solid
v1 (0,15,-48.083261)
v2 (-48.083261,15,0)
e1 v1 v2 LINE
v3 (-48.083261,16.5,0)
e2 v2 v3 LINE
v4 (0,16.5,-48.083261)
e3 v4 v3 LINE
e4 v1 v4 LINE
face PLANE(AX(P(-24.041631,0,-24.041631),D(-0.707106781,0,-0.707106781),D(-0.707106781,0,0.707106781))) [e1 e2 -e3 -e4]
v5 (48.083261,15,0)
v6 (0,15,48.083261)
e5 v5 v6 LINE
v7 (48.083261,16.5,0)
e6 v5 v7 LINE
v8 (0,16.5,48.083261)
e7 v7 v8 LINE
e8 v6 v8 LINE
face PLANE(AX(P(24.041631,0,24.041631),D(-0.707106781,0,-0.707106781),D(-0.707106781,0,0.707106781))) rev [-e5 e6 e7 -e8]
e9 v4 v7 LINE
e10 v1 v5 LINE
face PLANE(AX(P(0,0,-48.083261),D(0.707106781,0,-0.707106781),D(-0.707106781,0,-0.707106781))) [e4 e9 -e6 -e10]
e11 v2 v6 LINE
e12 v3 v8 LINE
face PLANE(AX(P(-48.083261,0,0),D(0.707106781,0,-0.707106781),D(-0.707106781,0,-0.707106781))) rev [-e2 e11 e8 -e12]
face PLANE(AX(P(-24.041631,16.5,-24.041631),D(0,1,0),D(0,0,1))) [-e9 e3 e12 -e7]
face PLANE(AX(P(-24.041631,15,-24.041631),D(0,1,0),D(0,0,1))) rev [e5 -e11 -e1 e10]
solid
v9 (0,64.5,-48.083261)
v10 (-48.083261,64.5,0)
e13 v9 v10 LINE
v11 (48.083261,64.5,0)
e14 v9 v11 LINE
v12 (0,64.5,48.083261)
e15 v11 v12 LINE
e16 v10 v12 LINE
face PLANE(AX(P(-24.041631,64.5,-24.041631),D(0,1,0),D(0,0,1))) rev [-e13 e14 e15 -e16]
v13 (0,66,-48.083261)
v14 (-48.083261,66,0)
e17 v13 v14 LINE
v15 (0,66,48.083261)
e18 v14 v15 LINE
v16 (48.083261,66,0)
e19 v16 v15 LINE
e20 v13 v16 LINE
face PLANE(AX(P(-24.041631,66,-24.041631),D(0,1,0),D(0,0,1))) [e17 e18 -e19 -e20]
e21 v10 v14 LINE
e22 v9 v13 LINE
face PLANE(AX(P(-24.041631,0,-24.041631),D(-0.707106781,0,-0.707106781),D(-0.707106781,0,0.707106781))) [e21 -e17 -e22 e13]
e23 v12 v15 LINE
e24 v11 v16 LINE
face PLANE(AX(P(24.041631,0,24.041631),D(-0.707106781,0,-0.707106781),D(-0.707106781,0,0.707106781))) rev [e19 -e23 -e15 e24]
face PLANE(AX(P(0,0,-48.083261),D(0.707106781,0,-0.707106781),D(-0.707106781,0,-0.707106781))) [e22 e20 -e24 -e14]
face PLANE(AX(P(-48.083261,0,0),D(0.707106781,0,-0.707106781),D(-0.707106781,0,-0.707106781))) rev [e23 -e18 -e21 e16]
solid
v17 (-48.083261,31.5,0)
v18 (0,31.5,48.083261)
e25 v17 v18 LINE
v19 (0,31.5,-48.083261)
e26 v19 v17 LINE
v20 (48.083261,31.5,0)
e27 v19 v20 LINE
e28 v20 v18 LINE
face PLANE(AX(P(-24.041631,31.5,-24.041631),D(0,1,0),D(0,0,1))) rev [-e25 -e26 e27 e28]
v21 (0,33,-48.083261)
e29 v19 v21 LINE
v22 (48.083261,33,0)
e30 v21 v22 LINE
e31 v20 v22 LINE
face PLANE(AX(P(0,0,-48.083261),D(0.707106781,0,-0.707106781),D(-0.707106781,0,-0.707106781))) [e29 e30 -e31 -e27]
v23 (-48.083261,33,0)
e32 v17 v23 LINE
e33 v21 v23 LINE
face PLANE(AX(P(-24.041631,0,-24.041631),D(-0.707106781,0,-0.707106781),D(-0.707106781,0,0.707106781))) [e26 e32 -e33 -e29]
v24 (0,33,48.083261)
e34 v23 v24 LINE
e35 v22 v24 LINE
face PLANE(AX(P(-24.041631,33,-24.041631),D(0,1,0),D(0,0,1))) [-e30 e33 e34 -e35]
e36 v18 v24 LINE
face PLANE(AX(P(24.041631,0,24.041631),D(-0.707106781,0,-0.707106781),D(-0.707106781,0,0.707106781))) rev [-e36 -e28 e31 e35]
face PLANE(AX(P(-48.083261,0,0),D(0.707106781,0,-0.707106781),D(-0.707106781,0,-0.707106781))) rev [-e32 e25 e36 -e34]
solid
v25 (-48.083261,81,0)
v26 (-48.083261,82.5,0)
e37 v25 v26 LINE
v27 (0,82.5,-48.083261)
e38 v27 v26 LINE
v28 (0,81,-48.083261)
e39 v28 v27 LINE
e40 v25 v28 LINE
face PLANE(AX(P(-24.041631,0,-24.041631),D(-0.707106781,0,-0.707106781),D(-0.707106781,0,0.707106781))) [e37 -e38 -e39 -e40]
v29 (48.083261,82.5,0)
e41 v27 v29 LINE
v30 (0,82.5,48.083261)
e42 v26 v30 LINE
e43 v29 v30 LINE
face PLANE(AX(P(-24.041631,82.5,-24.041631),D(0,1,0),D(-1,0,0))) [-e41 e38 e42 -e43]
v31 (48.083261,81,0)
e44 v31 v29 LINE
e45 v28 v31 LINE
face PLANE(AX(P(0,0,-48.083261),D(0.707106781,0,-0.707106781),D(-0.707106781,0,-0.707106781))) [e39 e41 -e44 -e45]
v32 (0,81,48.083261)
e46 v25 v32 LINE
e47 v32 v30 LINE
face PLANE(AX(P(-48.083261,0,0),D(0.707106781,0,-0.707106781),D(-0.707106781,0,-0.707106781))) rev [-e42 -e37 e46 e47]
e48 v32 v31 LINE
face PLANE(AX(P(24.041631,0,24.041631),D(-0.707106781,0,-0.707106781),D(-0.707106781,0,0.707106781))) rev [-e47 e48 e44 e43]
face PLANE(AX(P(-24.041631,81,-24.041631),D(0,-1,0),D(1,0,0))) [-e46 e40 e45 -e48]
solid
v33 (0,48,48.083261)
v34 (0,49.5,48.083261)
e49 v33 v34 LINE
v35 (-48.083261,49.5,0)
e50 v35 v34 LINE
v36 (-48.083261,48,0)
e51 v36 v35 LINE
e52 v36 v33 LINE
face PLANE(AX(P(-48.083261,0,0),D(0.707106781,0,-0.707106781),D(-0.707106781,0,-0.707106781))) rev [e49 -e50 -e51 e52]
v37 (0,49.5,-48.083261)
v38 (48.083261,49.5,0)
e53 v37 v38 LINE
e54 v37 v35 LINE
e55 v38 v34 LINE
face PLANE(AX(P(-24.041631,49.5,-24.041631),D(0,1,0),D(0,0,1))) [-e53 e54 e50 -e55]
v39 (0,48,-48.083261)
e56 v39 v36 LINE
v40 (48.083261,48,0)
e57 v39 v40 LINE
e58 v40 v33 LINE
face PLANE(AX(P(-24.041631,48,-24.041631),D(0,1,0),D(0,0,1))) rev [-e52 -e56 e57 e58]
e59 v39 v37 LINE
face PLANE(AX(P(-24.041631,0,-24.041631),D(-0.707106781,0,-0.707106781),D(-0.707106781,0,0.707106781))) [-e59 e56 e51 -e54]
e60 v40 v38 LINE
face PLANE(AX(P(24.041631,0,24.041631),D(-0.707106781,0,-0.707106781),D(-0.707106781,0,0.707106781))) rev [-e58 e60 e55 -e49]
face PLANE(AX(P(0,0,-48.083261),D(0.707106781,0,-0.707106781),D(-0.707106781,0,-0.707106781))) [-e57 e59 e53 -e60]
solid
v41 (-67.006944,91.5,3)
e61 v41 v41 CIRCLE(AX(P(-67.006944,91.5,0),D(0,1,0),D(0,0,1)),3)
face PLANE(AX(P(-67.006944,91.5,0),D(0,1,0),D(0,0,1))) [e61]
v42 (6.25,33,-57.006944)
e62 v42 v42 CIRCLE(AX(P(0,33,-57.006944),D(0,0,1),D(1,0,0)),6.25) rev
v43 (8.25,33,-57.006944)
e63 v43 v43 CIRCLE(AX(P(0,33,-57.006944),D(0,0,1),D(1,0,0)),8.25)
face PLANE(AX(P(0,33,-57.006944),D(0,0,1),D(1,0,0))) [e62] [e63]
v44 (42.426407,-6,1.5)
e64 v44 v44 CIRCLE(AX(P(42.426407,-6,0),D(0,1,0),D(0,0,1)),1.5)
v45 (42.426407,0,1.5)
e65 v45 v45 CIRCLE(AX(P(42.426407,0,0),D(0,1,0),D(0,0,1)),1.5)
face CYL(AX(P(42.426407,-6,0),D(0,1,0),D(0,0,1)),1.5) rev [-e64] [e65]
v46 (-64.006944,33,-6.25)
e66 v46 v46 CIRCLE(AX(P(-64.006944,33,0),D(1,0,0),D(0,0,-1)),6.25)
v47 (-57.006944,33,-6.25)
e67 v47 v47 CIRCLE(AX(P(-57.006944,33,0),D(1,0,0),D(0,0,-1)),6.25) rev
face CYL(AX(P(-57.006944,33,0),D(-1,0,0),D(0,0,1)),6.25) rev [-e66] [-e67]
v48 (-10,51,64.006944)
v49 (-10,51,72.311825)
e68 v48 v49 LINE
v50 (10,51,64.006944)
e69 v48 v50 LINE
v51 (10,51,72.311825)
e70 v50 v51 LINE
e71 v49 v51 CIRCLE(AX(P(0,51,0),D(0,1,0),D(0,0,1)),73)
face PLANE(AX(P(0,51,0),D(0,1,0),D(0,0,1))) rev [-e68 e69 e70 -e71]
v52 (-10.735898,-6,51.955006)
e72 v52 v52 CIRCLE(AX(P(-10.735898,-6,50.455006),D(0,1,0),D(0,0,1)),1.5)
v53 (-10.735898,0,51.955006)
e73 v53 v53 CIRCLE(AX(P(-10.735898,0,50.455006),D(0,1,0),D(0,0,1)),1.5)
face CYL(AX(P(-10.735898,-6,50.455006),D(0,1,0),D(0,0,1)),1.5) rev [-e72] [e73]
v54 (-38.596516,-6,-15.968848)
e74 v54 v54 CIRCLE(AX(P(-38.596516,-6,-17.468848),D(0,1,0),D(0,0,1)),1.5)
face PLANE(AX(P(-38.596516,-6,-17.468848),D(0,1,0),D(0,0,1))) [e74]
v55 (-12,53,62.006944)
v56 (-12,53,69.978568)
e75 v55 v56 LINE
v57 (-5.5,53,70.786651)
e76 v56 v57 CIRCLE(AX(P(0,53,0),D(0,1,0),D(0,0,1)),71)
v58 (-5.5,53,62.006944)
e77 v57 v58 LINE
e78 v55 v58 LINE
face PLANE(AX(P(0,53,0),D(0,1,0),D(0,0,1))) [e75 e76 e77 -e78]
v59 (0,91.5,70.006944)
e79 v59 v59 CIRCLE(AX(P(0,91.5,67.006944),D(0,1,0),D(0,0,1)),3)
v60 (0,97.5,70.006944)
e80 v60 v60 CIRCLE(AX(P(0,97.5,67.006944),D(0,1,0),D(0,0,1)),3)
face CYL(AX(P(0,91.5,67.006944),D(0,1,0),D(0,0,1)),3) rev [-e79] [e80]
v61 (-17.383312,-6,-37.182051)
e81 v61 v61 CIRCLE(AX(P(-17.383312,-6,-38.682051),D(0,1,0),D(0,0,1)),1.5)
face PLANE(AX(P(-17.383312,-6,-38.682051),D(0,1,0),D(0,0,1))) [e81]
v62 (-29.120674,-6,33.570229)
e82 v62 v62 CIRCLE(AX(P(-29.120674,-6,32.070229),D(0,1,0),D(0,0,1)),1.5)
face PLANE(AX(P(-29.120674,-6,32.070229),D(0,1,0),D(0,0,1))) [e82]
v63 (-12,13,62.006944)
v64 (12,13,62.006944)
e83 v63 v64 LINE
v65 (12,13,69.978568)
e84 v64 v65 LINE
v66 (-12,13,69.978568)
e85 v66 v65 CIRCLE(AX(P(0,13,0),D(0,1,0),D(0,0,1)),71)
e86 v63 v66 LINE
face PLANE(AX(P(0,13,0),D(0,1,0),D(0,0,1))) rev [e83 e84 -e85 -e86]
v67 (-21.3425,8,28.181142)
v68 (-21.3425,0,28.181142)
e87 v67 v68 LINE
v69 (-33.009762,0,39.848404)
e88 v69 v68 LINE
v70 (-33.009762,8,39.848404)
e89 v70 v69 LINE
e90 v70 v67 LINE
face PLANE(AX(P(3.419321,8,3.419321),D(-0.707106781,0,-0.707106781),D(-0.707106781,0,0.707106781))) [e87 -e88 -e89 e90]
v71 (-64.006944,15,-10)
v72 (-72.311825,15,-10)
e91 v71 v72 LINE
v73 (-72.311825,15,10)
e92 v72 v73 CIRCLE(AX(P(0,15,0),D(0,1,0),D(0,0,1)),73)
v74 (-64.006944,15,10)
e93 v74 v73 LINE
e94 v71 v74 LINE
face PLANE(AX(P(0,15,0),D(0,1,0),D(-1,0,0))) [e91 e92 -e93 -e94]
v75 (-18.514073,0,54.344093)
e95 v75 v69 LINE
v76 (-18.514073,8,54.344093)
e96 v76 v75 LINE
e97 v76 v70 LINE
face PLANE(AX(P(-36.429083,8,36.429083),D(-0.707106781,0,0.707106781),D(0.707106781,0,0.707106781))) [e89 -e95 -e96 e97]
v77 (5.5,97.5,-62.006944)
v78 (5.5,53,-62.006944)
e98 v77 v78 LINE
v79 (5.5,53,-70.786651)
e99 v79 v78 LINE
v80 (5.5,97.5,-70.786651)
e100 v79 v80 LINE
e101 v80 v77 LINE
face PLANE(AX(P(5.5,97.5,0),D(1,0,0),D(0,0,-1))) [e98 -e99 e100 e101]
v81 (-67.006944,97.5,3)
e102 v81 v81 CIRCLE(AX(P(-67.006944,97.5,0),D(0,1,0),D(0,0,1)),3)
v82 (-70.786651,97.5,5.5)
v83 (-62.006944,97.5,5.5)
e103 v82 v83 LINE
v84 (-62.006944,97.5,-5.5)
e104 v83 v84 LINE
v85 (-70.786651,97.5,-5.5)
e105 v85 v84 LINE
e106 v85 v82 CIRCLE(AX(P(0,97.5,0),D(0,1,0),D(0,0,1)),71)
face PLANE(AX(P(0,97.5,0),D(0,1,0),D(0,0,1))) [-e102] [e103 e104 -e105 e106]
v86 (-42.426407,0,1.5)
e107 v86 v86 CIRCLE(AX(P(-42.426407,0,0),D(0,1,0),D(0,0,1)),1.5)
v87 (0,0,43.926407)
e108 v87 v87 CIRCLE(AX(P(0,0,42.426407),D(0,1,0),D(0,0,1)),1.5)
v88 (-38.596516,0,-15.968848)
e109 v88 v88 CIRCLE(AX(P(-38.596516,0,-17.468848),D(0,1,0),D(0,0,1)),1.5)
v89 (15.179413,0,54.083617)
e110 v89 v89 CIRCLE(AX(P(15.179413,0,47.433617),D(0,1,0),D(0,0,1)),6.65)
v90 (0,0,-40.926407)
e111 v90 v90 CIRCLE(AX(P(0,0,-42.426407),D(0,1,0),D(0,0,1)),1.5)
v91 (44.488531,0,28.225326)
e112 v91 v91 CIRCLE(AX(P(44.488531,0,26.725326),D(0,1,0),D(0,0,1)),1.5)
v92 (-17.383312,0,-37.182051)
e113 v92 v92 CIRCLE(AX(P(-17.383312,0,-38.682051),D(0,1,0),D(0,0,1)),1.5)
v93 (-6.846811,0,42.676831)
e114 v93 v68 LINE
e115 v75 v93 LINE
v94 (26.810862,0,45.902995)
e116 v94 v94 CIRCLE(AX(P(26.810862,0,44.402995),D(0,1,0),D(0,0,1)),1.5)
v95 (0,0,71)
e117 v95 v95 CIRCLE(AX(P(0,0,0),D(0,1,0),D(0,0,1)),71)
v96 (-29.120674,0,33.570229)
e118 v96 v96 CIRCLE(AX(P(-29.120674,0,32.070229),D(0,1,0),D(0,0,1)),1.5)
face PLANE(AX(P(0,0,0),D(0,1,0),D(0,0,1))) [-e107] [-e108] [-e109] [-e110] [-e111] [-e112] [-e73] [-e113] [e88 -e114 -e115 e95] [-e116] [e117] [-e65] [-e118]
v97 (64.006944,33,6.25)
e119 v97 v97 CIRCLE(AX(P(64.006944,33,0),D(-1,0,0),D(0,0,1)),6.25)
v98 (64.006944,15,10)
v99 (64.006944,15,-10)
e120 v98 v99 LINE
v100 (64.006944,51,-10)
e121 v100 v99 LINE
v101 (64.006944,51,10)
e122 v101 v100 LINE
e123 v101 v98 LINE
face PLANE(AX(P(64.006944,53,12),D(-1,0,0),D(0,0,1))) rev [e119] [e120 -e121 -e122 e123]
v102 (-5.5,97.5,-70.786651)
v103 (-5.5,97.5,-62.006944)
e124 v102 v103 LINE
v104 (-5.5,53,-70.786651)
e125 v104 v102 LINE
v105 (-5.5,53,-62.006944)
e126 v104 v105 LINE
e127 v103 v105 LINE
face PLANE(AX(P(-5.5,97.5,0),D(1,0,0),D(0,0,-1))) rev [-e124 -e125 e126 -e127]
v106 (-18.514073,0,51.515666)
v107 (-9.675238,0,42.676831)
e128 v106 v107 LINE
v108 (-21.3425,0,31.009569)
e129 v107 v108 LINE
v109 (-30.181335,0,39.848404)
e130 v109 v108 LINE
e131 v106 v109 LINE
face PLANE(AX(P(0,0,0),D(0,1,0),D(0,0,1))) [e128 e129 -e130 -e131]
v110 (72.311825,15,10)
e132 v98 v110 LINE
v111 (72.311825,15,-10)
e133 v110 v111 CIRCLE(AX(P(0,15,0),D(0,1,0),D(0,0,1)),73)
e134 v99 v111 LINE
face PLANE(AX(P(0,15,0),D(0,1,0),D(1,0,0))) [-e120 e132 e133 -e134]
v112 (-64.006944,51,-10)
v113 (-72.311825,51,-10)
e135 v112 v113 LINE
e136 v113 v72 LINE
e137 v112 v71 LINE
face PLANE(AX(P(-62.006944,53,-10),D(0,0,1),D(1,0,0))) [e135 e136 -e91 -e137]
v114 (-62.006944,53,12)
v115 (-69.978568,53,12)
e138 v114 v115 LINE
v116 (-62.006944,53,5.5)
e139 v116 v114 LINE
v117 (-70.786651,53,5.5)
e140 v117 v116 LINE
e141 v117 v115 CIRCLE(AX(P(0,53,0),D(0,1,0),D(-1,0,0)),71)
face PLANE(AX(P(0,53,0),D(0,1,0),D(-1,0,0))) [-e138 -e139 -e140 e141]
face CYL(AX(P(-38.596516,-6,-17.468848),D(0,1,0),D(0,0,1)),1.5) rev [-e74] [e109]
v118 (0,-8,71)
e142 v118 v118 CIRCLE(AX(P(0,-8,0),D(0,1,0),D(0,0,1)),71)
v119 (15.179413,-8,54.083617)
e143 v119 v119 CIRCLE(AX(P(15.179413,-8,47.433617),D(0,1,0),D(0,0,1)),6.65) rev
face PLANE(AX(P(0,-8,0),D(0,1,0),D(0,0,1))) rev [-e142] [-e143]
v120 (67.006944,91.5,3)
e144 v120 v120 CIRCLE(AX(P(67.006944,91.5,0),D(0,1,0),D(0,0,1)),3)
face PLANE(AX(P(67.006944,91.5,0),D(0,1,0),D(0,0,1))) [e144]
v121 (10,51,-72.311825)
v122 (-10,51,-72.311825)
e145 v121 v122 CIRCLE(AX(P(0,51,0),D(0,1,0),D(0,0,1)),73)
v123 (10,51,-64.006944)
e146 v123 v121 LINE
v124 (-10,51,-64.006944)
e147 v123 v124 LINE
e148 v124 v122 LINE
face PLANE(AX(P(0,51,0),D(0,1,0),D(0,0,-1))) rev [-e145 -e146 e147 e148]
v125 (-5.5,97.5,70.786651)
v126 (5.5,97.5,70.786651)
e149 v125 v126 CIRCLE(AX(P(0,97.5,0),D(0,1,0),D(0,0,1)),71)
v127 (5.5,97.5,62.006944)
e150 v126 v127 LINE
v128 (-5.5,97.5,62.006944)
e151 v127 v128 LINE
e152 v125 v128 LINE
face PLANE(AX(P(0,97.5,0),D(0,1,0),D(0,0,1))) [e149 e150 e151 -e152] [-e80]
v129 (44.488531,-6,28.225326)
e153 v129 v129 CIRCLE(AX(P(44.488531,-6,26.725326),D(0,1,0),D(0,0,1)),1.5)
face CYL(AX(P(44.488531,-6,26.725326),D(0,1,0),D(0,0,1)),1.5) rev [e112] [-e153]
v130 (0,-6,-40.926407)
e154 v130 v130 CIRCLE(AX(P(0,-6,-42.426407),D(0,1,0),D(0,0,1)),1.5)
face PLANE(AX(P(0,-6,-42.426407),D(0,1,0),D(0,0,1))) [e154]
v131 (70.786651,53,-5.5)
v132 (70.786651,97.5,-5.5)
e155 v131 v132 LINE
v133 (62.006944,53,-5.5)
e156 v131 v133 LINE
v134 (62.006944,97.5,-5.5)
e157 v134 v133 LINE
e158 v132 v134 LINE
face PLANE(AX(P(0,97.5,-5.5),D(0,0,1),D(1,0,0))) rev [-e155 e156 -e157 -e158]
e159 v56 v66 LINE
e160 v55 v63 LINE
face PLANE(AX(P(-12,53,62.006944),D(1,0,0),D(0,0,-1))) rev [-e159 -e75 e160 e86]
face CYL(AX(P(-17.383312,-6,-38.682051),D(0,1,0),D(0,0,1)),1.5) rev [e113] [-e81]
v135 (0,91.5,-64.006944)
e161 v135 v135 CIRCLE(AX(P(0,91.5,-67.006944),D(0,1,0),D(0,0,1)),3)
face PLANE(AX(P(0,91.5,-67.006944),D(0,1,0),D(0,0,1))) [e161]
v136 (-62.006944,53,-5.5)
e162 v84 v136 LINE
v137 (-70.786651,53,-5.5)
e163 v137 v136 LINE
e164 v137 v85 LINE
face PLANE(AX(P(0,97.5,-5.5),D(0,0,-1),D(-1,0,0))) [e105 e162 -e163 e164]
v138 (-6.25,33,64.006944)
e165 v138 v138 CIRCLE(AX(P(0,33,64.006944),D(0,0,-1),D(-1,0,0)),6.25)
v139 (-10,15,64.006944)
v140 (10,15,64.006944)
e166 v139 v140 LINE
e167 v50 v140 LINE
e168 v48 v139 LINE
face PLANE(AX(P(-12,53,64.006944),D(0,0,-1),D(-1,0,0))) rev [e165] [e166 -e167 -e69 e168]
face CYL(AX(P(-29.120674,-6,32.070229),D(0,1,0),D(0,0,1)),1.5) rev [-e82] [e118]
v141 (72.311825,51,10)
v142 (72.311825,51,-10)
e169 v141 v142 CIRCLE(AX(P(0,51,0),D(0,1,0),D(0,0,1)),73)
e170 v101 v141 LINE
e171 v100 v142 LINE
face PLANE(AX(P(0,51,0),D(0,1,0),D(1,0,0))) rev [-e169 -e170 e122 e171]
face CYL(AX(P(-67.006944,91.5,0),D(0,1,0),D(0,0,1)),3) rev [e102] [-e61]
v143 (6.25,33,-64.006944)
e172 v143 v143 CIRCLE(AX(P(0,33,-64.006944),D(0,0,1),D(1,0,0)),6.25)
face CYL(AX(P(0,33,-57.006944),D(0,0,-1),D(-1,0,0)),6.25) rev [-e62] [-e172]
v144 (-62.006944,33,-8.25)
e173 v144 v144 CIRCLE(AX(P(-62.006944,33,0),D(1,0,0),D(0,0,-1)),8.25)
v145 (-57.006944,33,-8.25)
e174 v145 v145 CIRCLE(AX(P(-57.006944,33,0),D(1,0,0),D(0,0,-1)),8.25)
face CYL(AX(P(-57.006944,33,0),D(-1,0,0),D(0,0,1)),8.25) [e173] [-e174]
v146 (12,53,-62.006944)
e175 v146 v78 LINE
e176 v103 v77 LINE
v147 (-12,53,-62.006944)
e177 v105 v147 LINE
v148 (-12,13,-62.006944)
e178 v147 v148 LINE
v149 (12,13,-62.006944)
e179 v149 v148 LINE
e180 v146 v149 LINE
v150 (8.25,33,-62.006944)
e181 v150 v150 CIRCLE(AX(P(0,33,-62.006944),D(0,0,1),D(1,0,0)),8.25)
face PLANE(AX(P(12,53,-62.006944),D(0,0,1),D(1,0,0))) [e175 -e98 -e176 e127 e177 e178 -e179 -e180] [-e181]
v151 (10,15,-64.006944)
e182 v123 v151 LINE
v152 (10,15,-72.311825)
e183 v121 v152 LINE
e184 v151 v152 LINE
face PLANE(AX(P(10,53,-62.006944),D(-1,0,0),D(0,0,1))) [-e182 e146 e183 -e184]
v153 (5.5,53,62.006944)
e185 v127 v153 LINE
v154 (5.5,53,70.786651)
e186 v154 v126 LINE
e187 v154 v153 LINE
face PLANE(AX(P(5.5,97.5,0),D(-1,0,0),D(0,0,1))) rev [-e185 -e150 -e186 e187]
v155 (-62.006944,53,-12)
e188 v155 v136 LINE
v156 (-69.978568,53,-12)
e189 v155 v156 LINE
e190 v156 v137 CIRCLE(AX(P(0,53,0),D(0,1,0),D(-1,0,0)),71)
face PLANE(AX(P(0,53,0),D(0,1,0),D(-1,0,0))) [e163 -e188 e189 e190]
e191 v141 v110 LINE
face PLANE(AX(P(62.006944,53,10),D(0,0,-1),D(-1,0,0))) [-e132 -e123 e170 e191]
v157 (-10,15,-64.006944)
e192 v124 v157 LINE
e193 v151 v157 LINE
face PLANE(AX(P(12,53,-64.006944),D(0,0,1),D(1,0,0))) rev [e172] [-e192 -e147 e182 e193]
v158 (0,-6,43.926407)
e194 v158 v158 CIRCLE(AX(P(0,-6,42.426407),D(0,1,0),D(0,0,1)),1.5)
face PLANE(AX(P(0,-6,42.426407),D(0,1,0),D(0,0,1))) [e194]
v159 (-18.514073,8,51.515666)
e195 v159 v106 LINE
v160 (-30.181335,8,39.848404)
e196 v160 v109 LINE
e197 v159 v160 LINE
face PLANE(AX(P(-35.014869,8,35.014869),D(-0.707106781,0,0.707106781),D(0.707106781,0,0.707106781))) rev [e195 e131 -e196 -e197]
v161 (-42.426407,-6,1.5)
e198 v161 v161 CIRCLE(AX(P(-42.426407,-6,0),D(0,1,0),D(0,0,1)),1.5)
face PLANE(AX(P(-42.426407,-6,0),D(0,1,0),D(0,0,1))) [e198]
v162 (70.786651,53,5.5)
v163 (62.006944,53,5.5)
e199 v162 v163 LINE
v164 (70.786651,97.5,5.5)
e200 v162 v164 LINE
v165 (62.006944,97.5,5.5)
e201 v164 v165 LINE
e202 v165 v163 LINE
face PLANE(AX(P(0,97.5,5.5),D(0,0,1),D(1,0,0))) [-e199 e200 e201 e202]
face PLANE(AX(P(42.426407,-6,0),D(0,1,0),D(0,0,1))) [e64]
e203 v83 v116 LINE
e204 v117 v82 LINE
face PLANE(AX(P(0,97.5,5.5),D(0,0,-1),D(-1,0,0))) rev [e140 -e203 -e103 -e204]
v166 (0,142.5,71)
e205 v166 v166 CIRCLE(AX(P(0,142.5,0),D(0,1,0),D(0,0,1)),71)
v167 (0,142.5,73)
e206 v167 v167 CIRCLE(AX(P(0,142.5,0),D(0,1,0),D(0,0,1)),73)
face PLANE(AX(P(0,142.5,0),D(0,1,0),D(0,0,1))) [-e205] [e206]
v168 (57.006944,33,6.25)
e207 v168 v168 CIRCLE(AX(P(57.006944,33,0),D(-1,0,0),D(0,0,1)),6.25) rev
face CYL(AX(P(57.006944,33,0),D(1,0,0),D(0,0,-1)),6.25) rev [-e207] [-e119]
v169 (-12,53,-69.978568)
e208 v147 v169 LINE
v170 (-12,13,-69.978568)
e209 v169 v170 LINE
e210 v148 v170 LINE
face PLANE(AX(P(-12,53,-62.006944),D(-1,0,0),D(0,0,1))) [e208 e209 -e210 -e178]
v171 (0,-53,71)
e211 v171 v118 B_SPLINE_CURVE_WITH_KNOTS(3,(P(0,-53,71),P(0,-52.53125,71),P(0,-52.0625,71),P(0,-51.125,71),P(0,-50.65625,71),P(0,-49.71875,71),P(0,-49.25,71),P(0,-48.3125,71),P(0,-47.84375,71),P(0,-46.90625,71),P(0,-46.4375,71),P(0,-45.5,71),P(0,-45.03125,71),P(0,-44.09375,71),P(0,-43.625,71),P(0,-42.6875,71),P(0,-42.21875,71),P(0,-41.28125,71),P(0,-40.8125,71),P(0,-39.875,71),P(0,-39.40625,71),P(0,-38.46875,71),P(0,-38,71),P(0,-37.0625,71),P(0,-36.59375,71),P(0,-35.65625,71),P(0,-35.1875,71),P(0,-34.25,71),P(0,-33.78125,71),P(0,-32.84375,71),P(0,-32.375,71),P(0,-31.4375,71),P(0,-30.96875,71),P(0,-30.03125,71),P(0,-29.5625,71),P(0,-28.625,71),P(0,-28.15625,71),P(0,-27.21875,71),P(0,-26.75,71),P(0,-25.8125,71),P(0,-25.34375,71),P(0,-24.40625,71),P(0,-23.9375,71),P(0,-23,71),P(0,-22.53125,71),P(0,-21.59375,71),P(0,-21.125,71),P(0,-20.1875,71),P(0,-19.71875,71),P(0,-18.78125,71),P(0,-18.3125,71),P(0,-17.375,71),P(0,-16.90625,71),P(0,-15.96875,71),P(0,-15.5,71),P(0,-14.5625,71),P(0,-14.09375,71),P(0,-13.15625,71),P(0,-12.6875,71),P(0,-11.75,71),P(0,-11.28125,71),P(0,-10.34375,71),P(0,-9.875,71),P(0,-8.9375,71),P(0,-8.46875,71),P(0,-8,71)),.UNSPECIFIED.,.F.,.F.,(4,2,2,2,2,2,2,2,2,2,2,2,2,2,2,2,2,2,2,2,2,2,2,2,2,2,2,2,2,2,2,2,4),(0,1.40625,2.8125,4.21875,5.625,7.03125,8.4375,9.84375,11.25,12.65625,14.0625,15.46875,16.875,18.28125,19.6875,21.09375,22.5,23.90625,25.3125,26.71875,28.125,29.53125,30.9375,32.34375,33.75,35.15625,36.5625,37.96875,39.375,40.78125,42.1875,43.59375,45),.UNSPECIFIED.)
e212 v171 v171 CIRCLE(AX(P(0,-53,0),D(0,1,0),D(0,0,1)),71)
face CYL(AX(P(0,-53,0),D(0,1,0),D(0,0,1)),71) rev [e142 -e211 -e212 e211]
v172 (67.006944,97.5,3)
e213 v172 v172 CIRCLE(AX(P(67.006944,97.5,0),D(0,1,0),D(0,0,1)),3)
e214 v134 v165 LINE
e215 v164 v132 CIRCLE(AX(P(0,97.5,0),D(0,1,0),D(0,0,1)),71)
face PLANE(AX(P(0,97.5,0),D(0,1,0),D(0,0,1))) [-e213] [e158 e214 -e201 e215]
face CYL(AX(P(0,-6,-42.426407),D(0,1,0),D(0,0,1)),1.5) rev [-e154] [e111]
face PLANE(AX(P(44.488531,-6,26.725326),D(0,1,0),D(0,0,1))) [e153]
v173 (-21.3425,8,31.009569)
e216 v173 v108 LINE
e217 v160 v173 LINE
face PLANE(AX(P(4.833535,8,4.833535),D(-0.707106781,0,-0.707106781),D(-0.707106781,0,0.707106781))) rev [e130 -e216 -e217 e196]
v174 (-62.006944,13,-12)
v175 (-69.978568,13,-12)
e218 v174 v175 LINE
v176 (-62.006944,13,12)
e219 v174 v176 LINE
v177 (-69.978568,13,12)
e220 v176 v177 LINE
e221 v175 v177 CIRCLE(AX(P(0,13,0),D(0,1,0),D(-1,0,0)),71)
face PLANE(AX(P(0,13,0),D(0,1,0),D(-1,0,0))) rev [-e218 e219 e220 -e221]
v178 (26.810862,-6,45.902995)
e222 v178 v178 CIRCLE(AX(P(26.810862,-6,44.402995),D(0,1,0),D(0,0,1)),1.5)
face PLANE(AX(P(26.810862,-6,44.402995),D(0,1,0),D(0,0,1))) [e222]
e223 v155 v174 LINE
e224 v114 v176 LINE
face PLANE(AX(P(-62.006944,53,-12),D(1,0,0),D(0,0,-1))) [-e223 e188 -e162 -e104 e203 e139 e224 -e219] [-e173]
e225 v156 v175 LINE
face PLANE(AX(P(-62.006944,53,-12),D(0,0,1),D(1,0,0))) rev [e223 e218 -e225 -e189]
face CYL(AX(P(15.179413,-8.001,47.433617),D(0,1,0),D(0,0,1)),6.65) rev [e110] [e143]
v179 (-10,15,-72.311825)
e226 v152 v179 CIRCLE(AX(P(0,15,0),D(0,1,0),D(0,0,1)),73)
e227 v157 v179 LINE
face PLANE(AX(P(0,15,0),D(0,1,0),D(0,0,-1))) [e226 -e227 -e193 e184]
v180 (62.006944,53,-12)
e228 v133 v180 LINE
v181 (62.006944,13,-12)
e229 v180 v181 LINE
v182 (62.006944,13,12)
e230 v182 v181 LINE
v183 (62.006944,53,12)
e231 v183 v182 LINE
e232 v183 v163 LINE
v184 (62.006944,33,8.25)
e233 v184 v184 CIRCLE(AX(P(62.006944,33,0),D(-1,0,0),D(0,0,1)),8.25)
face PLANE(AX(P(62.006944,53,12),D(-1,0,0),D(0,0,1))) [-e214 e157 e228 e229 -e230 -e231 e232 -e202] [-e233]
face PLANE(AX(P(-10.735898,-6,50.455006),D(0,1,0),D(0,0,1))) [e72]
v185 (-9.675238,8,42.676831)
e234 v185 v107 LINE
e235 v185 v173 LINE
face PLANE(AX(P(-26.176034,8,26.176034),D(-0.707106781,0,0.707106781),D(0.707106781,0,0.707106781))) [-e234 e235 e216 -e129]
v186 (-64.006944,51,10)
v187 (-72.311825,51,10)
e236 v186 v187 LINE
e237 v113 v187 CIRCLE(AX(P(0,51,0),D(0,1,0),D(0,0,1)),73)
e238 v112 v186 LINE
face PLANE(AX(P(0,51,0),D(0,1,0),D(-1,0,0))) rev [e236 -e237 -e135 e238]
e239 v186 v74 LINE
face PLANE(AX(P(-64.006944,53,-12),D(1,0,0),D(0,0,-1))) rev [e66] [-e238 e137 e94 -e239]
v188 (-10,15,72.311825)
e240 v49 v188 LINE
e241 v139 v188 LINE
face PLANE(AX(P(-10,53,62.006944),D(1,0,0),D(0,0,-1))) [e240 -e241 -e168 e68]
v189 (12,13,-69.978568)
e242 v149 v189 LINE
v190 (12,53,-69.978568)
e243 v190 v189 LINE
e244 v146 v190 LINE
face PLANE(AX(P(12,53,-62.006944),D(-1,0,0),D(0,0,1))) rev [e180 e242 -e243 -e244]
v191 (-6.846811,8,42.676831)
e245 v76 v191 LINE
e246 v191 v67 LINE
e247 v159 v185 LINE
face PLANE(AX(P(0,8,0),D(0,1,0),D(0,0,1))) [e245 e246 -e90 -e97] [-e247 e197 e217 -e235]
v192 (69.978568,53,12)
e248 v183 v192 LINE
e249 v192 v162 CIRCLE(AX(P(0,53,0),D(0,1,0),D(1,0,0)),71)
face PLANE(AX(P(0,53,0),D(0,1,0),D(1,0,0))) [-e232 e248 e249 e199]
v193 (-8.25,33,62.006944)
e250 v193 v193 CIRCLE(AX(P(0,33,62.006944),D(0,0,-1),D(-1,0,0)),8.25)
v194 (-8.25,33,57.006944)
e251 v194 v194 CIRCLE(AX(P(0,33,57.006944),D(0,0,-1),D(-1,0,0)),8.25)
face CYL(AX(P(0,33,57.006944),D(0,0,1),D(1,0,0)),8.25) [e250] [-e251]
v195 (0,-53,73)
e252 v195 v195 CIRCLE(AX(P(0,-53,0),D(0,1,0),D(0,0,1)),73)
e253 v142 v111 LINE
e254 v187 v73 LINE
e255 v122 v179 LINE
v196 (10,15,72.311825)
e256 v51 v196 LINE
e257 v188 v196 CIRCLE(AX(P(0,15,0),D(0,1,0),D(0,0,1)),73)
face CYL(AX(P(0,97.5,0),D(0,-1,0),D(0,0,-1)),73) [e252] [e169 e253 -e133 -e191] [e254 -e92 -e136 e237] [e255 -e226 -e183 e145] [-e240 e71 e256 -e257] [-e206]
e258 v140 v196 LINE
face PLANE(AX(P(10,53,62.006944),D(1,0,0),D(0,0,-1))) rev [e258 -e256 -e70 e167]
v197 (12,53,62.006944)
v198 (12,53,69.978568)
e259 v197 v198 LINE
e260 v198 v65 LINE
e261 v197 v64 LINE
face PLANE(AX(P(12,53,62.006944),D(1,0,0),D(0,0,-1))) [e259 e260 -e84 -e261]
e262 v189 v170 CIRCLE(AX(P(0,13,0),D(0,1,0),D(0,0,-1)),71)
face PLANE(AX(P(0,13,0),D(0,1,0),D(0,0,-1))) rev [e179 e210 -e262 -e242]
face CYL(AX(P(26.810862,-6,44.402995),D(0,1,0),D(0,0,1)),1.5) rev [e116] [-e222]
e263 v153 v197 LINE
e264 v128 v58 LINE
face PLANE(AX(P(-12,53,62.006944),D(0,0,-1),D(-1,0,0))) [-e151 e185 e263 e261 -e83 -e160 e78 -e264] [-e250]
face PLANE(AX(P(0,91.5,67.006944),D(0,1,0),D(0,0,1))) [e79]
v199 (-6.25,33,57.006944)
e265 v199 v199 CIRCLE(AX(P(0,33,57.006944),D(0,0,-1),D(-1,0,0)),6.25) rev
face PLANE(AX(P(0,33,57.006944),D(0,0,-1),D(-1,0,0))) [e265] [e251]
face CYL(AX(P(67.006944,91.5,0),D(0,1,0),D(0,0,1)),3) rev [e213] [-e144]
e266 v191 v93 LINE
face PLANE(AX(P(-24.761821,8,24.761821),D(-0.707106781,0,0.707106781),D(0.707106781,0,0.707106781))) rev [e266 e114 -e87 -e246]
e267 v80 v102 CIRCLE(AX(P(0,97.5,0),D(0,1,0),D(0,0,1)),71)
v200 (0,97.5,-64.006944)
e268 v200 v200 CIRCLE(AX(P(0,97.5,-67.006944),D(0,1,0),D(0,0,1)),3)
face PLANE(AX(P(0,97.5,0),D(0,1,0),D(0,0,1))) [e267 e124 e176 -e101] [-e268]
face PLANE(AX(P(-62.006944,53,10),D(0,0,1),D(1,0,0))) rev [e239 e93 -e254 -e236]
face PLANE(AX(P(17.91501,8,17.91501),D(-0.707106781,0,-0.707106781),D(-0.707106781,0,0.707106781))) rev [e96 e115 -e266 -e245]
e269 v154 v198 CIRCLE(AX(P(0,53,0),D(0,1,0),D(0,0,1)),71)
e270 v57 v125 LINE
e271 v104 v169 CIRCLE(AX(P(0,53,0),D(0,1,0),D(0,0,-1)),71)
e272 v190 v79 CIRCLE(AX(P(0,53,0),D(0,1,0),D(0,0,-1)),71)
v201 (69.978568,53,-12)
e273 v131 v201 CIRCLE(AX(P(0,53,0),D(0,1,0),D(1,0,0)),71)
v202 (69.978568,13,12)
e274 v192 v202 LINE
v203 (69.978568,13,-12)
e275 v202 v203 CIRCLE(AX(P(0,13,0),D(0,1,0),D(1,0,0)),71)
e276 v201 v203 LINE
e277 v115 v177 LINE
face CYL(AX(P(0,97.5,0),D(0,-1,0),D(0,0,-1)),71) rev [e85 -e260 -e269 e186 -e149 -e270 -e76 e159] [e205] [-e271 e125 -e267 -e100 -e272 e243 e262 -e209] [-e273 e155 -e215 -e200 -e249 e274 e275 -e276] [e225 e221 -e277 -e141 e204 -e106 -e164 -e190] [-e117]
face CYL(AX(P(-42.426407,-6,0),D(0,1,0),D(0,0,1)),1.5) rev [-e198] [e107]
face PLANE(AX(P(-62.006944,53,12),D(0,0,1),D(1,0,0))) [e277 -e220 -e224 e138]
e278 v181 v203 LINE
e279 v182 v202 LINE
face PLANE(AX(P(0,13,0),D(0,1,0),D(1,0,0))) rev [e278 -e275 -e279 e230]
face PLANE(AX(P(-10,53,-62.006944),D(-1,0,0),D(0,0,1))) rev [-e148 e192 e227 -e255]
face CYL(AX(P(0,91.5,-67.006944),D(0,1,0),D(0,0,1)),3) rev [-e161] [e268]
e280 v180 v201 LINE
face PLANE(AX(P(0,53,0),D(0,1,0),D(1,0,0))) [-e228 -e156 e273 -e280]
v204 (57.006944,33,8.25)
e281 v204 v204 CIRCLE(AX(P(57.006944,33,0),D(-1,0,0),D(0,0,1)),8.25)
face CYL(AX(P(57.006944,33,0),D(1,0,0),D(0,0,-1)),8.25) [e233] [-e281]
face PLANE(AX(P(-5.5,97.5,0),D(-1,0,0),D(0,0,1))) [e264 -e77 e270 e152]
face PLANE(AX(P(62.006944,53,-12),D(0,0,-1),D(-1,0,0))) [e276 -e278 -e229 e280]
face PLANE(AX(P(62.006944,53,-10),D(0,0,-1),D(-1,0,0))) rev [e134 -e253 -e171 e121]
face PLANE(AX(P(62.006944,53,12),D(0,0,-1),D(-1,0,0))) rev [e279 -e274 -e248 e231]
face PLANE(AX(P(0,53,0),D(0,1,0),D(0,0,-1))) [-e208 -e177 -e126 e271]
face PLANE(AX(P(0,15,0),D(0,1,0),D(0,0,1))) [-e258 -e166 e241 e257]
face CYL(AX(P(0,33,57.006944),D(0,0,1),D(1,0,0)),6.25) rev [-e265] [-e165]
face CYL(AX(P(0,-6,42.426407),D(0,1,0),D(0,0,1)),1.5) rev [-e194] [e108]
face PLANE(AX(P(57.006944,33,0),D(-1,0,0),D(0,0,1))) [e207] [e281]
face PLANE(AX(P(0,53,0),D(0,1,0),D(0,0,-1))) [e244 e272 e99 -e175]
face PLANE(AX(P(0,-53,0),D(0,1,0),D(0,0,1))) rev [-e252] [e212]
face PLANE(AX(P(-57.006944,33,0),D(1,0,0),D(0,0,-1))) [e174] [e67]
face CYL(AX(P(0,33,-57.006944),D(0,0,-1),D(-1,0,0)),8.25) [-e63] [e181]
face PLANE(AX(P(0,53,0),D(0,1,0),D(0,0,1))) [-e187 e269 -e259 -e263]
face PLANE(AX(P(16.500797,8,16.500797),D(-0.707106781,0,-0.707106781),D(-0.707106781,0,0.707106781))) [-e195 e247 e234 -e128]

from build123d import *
from build123d.topology import SkipClean

# Parameters (mm, degrees)
SKETCH_4_W                = 68
SKETCH_4_H                = 1.5
EXTRUDE_1_DEPTH           = 34
EXTRUDE_1_2_DEPTH         = 34
EXTRUDE_1_3_DEPTH         = 34
EXTRUDE_1_4_DEPTH         = 34
EXTRUDE_1_5_DEPTH         = 34
SKETCH_1_R                = 73
SKETCH_1_R_2              = 71
EXTRUDE_2_DEPTH           = 97.5
EXTRUDE_START             = 33
SKETCH_6_W                = 24
SKETCH_6_H                = 10
EXTRUDE_4_DEPTH           = 20
EXTRUDE_START_2           = 62.006944
SKETCH_5_R                = 8.25
EXTRUDE_5_DEPTH           = 5
PATTERN_CIRCULAR_1_COUNT  = 4
SHELL_START               = -73.0000001
SHELL_4_OUTLINE_W         = 20
SHELL_4_OUTLINE_H         = 36
SHELL_4_DEPTH             = 8.99305599
SHELL_START_2             = 64.00694411
SHELL_4_2_OUTLINE_W       = 20
SHELL_4_2_OUTLINE_H       = 36
SHELL_4_2_DEPTH           = 8.99305589
SHELL_START_3             = -64.00694411
SHELL_4_3_OUTLINE_R       = 6.25
SHELL_4_3_DEPTH           = 5
SHELL_START_4             = 59.00694411
SHELL_4_4_OUTLINE_R       = 6.25
SHELL_4_4_DEPTH           = 5
SHELL_4_5_OUTLINE_W       = 36
SHELL_4_5_OUTLINE_H       = 20
SHELL_4_5_DEPTH           = 8.99305599
SHELL_4_6_OUTLINE_W       = 36
SHELL_4_6_OUTLINE_H       = 20
SHELL_4_6_DEPTH           = 8.99305589
SHELL_4_7_OUTLINE_R       = 6.25
SHELL_4_7_DEPTH           = 5
SHELL_4_8_OUTLINE_R       = 6.25
SHELL_4_8_DEPTH           = 5
SKETCH_8_R                = 6.25
CUT_EXTRUDE_7_DEPTH       = 2
PATTERN_CIRCULAR_17_COUNT = 4
SKETCH_1_43_R             = 73
EXTRUDE_6_DEPTH           = 8
EXTRUDE_START_3           = 53
SKETCH_6_4_W              = 11
SKETCH_6_4_H              = 10
EXTRUDE_7_DEPTH           = 44.5
PATTERN_CIRCULAR_18_COUNT = 4
SKETCH_10_R               = 6.65
CUT_EXTRUDE_8_DEPTH       = 8
EXTRUDE_4_2_DEPTH         = 8
SKETCH_9_3_R              = 1.5
CUT_EXTRUDE_9_DEPTH       = 6
SKETCH_11_R               = 1.5
CUT_EXTRUDE_10_DEPTH      = 6
CUT_EXTRUDE_START         = 97.5
SKETCH_6_7_R              = 3
CUT_EXTRUDE_11_DEPTH      = 6
PATTERN_CIRCULAR_19_COUNT = 4
EXTRUDE_START_4           = 97.5
SKETCH_1_44_R             = 73
SKETCH_1_44_R_2           = 71
EXTRUDE_9_DEPTH           = 45
EXTRUDE_START_5           = -8
SKETCH_1_45_R             = 73
SKETCH_1_45_R_2           = 71
EXTRUDE_10_DEPTH          = 45
SKETCH_1_46_R             = 1.5
CUT_EXTRUDE_12_DEPTH      = 6


# Read off the part's stored shape, not the designer's step: 薄殼4
with BuildPart() as part:
    # 草圖4 → 填料-伸長1 (new, symmetric)
    with BuildSketch(Plane(origin=(0, 0, 0), x_dir=(-0.7071067811865477, 0, 0.7071067811865475), z_dir=(-0.7071067811865475, 0, -0.7071067811865477))):
        with Locations((0, 15.75)):
            Rectangle(SKETCH_4_W, SKETCH_4_H)
    extrude(amount=EXTRUDE_1_DEPTH, both=True)


with BuildPart() as body_2:
    # 草圖4 → Extrude 1 2 (new, symmetric)
    with BuildSketch(Plane(origin=(0, 0, 0), x_dir=(-0.7071067811865477, 0, 0.7071067811865475), z_dir=(-0.7071067811865475, 0, -0.7071067811865477))):
        with Locations((0, 32.25)):
            Rectangle(SKETCH_4_W, SKETCH_4_H)
    extrude(amount=EXTRUDE_1_2_DEPTH, both=True)


with BuildPart() as body_3:
    # 草圖4 → Extrude 1 3 (new, symmetric)
    with BuildSketch(Plane(origin=(0, 0, 0), x_dir=(-0.7071067811865477, 0, 0.7071067811865475), z_dir=(-0.7071067811865475, 0, -0.7071067811865477))):
        with Locations((0, 48.75)):
            Rectangle(SKETCH_4_W, SKETCH_4_H)
    extrude(amount=EXTRUDE_1_3_DEPTH, both=True)


with BuildPart() as body_4:
    # 草圖4 → Extrude 1 4 (new, symmetric)
    with BuildSketch(Plane(origin=(0, 0, 0), x_dir=(-0.7071067811865477, 0, 0.7071067811865475), z_dir=(-0.7071067811865475, 0, -0.7071067811865477))):
        with Locations((0, 65.25)):
            Rectangle(SKETCH_4_W, SKETCH_4_H)
    extrude(amount=EXTRUDE_1_4_DEPTH, both=True)


with BuildPart() as body_5:
    # 草圖4 → Extrude 1 5 (new, symmetric)
    with BuildSketch(Plane(origin=(0, 0, 0), x_dir=(-0.7071067811865477, 0, 0.7071067811865475), z_dir=(-0.7071067811865475, 0, -0.7071067811865477))):
        with Locations((0, 81.75)):
            Rectangle(SKETCH_4_W, SKETCH_4_H)
    extrude(amount=EXTRUDE_1_5_DEPTH, both=True)


with BuildPart() as body_6:
    # 草圖1 → 填料-伸長2 (new body)
    with BuildSketch(Plane(origin=(0, 0, 0), x_dir=(1, 0, 0), z_dir=(0, 1, 0))):
        with Locations(Location((0, 0, 0), (0, 0, 270))):
            Circle(SKETCH_1_R)
        with Locations(Location((0, 0, 0), (0, 0, 270))):
            Circle(SKETCH_1_R_2, mode=Mode.SUBTRACT)
    extrude(amount=EXTRUDE_2_DEPTH)

    # 草圖6 → Extrude 4 (add, symmetric)
    with BuildSketch(Plane(origin=(0, 0, 0), x_dir=(1, 0, 0), z_dir=(0, 1, 0)).offset(EXTRUDE_START)):
        with Locations((0, -67.00694411)):
            Rectangle(SKETCH_6_W, SKETCH_6_H)
    extrude_4 = extrude(amount=EXTRUDE_4_DEPTH, both=True)

    # 草圖5 → 填料-伸長5 (add)
    with BuildSketch(Plane.XY.offset(EXTRUDE_START_2)):
        with Locations(Location((0, 33, 0), (0, 0, 180))):
            Circle(SKETCH_5_R)
    extrude_5 = extrude(amount=-EXTRUDE_5_DEPTH)

    # 環狀複製排列1: Extrude 4, 填料-伸長5 ×4 about axis
    pattern_circular_1_axis = Axis((0, 0, 0), (0, 1, 0))
    add([extrude_4.rotate(pattern_circular_1_axis, i * 360 / PATTERN_CIRCULAR_1_COUNT) for i in range(1, PATTERN_CIRCULAR_1_COUNT)])
    add([extrude_5.rotate(pattern_circular_1_axis, i * 360 / PATTERN_CIRCULAR_1_COUNT) for i in range(1, PATTERN_CIRCULAR_1_COUNT)])

    # 薄殼4 outline → 薄殼4 (cut)
    with BuildSketch(Plane.XY.offset(SHELL_START)):
        with Locations((0, 33)):
            Rectangle(SHELL_4_OUTLINE_W, SHELL_4_OUTLINE_H)
    extrude(amount=SHELL_4_DEPTH, mode=Mode.SUBTRACT)

    # Shell 4 2 outline → Shell 4 2 (cut)
    with BuildSketch(Plane.XY.offset(SHELL_START_2)):
        with Locations((0, 33)):
            Rectangle(SHELL_4_2_OUTLINE_W, SHELL_4_2_OUTLINE_H)
    extrude(amount=SHELL_4_2_DEPTH, mode=Mode.SUBTRACT)

    # Shell 4 3 outline → Shell 4 3 (cut)
    with BuildSketch(Plane.XY.offset(SHELL_START_3)):
        with Locations((0, 33)):
            Circle(SHELL_4_3_OUTLINE_R)
    extrude(amount=SHELL_4_3_DEPTH, mode=Mode.SUBTRACT)

    # Shell 4 4 outline → Shell 4 4 (cut)
    with BuildSketch(Plane.XY.offset(SHELL_START_4)):
        with Locations((0, 33)):
            Circle(SHELL_4_4_OUTLINE_R)
    extrude(amount=SHELL_4_4_DEPTH, mode=Mode.SUBTRACT)

    # Shell 4 5 outline → Shell 4 5 (cut)
    with BuildSketch(Plane.YZ.offset(SHELL_START)):
        with Locations((33, 0)):
            Rectangle(SHELL_4_5_OUTLINE_W, SHELL_4_5_OUTLINE_H)
    extrude(amount=SHELL_4_5_DEPTH, mode=Mode.SUBTRACT)

    # Shell 4 6 outline → Shell 4 6 (cut)
    with BuildSketch(Plane.YZ.offset(SHELL_START_2)):
        with Locations((33, 0)):
            Rectangle(SHELL_4_6_OUTLINE_W, SHELL_4_6_OUTLINE_H)
    extrude(amount=SHELL_4_6_DEPTH, mode=Mode.SUBTRACT)

    # Shell 4 7 outline → Shell 4 7 (cut)
    with BuildSketch(Plane.YZ.offset(SHELL_START_3)):
        with Locations((33, 0)):
            Circle(SHELL_4_7_OUTLINE_R)
    extrude(amount=SHELL_4_7_DEPTH, mode=Mode.SUBTRACT)

    # Shell 4 8 outline → Shell 4 8 (cut)
    with BuildSketch(Plane.YZ.offset(SHELL_START_4)):
        with Locations((33, 0)):
            Circle(SHELL_4_8_OUTLINE_R)
    extrude(amount=SHELL_4_8_DEPTH, mode=Mode.SUBTRACT)

    # 草圖8 → 除料-伸長7 (cut)
    with BuildSketch(Plane.ZY.offset(59.00694411)):
        with Locations((0, 33)):
            Circle(SKETCH_8_R)
    cut_extrude_7 = extrude(amount=-CUT_EXTRUDE_7_DEPTH, mode=Mode.SUBTRACT)

    # 環狀複製排列17: 除料-伸長7 ×4 about axis
    with SkipClean():  # the faces are left unmerged after this step: merging them gives an invalid solid
        pattern_circular_17_axis = Axis((0, 97.5, 0), (0, -1, 0))
        for i in range(1, PATTERN_CIRCULAR_17_COUNT):
            add(cut_extrude_7.rotate(pattern_circular_17_axis, i * 360 / PATTERN_CIRCULAR_17_COUNT), mode=Mode.SUBTRACT)

    # 草圖1<43> → 填料-伸長6 (add)
    with BuildSketch(Plane(origin=(0, 0, 0), x_dir=(1, 0, 0), z_dir=(0, 1, 0))):
        with Locations(Location((0, 0, 0), (0, 0, 270))):
            Circle(SKETCH_1_43_R)
    extrude(amount=-EXTRUDE_6_DEPTH)

    # 草圖6<4> → 填料-伸長7 (add)
    with BuildSketch(Plane(origin=(0, 0, 0), x_dir=(1, 0, 0), z_dir=(0, 1, 0)).offset(EXTRUDE_START_3)):
        with Locations((0, -67.00694411)):
            Rectangle(SKETCH_6_4_W, SKETCH_6_4_H)
    extrude_7 = extrude(amount=EXTRUDE_7_DEPTH)

    # 環狀複製排列18: 填料-伸長7 ×4 about axis
    pattern_circular_18_axis = Axis((0, 0, 0), (0, 1, 0))
    for i in range(1, PATTERN_CIRCULAR_18_COUNT):
        add(extrude_7.rotate(pattern_circular_18_axis, i * 360 / PATTERN_CIRCULAR_18_COUNT))

    # 草圖10 → 除料-伸長8 (cut)
    with BuildSketch(Plane(origin=(0, 0, 0), x_dir=(1, 0, 0), z_dir=(0, 1, 0))):
        with Locations(Location((15.179413453, -47.433616995, 0), (0, 0, 270))):
            Circle(SKETCH_10_R)
    extrude(amount=-CUT_EXTRUDE_8_DEPTH, mode=Mode.SUBTRACT)

    # 草圖9 → Extrude 4 2 (add)
    with BuildSketch(Plane(origin=(0, 0, 0), x_dir=(1, 0, 0), z_dir=(0, 1, 0))):
        Polygon((-21.342499834, -28.181142035), (-6.846810819, -42.67683105), (-18.514072709, -54.344092939), (-33.009761723, -39.848403925), align=None)
        Polygon((-21.342499834, -31.00956916), (-9.675237944, -42.67683105), (-18.514072709, -51.515665814), (-30.181334598, -39.848403925), align=None, mode=Mode.SUBTRACT)
    extrude(amount=EXTRUDE_4_2_DEPTH)

    # 草圖9<3> → 除料-伸長9 (cut)
    with BuildSketch(Plane(origin=(0, 0, 0), x_dir=(1, 0, 0), z_dir=(0, 1, 0))):
        with Locations(Location((-29.120674427, -32.070229332, 0), (0, 0, 270))):
            Circle(SKETCH_9_3_R)
        with Locations(Location((-10.735898116, -50.455005643, 0), (0, 0, 270))):
            Circle(SKETCH_9_3_R)
    extrude(amount=-CUT_EXTRUDE_9_DEPTH, mode=Mode.SUBTRACT)

    # 草圖11 → 除料-伸長10 (cut)
    with BuildSketch(Plane(origin=(0, 0, 0), x_dir=(1, 0, 0), z_dir=(0, 1, 0))):
        with Locations(Location((-17.38331229, 38.682051461, 0), (0, 0, 270))):
            Circle(SKETCH_11_R)
        with Locations(Location((-38.596515726, 17.468848025, 0), (0, 0, 270))):
            Circle(SKETCH_11_R)
        with Locations(Location((44.488531064, -26.725325799, 0), (0, 0, 270))):
            Circle(SKETCH_11_R)
        with Locations(Location((26.810861534, -44.402995328, 0), (0, 0, 270))):
            Circle(SKETCH_11_R)
    extrude(amount=-CUT_EXTRUDE_10_DEPTH, mode=Mode.SUBTRACT)

    # 草圖6<7> → 除料-伸長11 (cut)
    with BuildSketch(Plane(origin=(0, 0, 0), x_dir=(1, 0, 0), z_dir=(0, 1, 0)).offset(CUT_EXTRUDE_START)):
        with Locations(Location((0, -67.00694411, 0), (0, 0, 270))):
            Circle(SKETCH_6_7_R)
    cut_extrude_11 = extrude(amount=-CUT_EXTRUDE_11_DEPTH, mode=Mode.SUBTRACT)

    # 環狀複製排列19: 除料-伸長11 ×4 about axis
    pattern_circular_19_axis = Axis((0, 0, 0), (0, 1, 0))
    for i in range(1, PATTERN_CIRCULAR_19_COUNT):
        add(cut_extrude_11.rotate(pattern_circular_19_axis, i * 360 / PATTERN_CIRCULAR_19_COUNT), mode=Mode.SUBTRACT)

    # 草圖1<44> → 填料-伸長9 (add)
    with BuildSketch(Plane(origin=(0, 0, 0), x_dir=(1, 0, 0), z_dir=(0, 1, 0)).offset(EXTRUDE_START_4)):
        with Locations(Location((0, 0, 0), (0, 0, 270))):
            Circle(SKETCH_1_44_R)
        with Locations(Location((0, 0, 0), (0, 0, 270))):
            Circle(SKETCH_1_44_R_2, mode=Mode.SUBTRACT)
    extrude(amount=EXTRUDE_9_DEPTH)

    # 草圖1<45> → 填料-伸長10 (add)
    with BuildSketch(Plane(origin=(0, 0, 0), x_dir=(1, 0, 0), z_dir=(0, 1, 0)).offset(EXTRUDE_START_5)):
        with Locations(Location((0, 0, 0), (0, 0, 270))):
            Circle(SKETCH_1_45_R)
        with Locations(Location((0, 0, 0), (0, 0, 270))):
            Circle(SKETCH_1_45_R_2, mode=Mode.SUBTRACT)
    extrude(amount=-EXTRUDE_10_DEPTH)

    # 草圖1<46> → 除料-伸長12 (cut)
    with BuildSketch(Plane(origin=(0, 0, 0), x_dir=(1, 0, 0), z_dir=(0, 1, 0))):
        with Locations(Location((42.426406871, 0, 0), (0, 0, 270))):
            Circle(SKETCH_1_46_R)
        with Locations(Location((0, -42.426406871, 0), (0, 0, 270))):
            Circle(SKETCH_1_46_R)
        with Locations(Location((-42.426406871, 0, 0), (0, 0, 270))):
            Circle(SKETCH_1_46_R)
        with Locations(Location((0, 42.426406871, 0), (0, 0, 270))):
            Circle(SKETCH_1_46_R)
    extrude(amount=-CUT_EXTRUDE_12_DEPTH, mode=Mode.SUBTRACT)


solid = Compound([part.part, body_2.part, body_3.part, body_4.part, body_5.part, body_6.part])
